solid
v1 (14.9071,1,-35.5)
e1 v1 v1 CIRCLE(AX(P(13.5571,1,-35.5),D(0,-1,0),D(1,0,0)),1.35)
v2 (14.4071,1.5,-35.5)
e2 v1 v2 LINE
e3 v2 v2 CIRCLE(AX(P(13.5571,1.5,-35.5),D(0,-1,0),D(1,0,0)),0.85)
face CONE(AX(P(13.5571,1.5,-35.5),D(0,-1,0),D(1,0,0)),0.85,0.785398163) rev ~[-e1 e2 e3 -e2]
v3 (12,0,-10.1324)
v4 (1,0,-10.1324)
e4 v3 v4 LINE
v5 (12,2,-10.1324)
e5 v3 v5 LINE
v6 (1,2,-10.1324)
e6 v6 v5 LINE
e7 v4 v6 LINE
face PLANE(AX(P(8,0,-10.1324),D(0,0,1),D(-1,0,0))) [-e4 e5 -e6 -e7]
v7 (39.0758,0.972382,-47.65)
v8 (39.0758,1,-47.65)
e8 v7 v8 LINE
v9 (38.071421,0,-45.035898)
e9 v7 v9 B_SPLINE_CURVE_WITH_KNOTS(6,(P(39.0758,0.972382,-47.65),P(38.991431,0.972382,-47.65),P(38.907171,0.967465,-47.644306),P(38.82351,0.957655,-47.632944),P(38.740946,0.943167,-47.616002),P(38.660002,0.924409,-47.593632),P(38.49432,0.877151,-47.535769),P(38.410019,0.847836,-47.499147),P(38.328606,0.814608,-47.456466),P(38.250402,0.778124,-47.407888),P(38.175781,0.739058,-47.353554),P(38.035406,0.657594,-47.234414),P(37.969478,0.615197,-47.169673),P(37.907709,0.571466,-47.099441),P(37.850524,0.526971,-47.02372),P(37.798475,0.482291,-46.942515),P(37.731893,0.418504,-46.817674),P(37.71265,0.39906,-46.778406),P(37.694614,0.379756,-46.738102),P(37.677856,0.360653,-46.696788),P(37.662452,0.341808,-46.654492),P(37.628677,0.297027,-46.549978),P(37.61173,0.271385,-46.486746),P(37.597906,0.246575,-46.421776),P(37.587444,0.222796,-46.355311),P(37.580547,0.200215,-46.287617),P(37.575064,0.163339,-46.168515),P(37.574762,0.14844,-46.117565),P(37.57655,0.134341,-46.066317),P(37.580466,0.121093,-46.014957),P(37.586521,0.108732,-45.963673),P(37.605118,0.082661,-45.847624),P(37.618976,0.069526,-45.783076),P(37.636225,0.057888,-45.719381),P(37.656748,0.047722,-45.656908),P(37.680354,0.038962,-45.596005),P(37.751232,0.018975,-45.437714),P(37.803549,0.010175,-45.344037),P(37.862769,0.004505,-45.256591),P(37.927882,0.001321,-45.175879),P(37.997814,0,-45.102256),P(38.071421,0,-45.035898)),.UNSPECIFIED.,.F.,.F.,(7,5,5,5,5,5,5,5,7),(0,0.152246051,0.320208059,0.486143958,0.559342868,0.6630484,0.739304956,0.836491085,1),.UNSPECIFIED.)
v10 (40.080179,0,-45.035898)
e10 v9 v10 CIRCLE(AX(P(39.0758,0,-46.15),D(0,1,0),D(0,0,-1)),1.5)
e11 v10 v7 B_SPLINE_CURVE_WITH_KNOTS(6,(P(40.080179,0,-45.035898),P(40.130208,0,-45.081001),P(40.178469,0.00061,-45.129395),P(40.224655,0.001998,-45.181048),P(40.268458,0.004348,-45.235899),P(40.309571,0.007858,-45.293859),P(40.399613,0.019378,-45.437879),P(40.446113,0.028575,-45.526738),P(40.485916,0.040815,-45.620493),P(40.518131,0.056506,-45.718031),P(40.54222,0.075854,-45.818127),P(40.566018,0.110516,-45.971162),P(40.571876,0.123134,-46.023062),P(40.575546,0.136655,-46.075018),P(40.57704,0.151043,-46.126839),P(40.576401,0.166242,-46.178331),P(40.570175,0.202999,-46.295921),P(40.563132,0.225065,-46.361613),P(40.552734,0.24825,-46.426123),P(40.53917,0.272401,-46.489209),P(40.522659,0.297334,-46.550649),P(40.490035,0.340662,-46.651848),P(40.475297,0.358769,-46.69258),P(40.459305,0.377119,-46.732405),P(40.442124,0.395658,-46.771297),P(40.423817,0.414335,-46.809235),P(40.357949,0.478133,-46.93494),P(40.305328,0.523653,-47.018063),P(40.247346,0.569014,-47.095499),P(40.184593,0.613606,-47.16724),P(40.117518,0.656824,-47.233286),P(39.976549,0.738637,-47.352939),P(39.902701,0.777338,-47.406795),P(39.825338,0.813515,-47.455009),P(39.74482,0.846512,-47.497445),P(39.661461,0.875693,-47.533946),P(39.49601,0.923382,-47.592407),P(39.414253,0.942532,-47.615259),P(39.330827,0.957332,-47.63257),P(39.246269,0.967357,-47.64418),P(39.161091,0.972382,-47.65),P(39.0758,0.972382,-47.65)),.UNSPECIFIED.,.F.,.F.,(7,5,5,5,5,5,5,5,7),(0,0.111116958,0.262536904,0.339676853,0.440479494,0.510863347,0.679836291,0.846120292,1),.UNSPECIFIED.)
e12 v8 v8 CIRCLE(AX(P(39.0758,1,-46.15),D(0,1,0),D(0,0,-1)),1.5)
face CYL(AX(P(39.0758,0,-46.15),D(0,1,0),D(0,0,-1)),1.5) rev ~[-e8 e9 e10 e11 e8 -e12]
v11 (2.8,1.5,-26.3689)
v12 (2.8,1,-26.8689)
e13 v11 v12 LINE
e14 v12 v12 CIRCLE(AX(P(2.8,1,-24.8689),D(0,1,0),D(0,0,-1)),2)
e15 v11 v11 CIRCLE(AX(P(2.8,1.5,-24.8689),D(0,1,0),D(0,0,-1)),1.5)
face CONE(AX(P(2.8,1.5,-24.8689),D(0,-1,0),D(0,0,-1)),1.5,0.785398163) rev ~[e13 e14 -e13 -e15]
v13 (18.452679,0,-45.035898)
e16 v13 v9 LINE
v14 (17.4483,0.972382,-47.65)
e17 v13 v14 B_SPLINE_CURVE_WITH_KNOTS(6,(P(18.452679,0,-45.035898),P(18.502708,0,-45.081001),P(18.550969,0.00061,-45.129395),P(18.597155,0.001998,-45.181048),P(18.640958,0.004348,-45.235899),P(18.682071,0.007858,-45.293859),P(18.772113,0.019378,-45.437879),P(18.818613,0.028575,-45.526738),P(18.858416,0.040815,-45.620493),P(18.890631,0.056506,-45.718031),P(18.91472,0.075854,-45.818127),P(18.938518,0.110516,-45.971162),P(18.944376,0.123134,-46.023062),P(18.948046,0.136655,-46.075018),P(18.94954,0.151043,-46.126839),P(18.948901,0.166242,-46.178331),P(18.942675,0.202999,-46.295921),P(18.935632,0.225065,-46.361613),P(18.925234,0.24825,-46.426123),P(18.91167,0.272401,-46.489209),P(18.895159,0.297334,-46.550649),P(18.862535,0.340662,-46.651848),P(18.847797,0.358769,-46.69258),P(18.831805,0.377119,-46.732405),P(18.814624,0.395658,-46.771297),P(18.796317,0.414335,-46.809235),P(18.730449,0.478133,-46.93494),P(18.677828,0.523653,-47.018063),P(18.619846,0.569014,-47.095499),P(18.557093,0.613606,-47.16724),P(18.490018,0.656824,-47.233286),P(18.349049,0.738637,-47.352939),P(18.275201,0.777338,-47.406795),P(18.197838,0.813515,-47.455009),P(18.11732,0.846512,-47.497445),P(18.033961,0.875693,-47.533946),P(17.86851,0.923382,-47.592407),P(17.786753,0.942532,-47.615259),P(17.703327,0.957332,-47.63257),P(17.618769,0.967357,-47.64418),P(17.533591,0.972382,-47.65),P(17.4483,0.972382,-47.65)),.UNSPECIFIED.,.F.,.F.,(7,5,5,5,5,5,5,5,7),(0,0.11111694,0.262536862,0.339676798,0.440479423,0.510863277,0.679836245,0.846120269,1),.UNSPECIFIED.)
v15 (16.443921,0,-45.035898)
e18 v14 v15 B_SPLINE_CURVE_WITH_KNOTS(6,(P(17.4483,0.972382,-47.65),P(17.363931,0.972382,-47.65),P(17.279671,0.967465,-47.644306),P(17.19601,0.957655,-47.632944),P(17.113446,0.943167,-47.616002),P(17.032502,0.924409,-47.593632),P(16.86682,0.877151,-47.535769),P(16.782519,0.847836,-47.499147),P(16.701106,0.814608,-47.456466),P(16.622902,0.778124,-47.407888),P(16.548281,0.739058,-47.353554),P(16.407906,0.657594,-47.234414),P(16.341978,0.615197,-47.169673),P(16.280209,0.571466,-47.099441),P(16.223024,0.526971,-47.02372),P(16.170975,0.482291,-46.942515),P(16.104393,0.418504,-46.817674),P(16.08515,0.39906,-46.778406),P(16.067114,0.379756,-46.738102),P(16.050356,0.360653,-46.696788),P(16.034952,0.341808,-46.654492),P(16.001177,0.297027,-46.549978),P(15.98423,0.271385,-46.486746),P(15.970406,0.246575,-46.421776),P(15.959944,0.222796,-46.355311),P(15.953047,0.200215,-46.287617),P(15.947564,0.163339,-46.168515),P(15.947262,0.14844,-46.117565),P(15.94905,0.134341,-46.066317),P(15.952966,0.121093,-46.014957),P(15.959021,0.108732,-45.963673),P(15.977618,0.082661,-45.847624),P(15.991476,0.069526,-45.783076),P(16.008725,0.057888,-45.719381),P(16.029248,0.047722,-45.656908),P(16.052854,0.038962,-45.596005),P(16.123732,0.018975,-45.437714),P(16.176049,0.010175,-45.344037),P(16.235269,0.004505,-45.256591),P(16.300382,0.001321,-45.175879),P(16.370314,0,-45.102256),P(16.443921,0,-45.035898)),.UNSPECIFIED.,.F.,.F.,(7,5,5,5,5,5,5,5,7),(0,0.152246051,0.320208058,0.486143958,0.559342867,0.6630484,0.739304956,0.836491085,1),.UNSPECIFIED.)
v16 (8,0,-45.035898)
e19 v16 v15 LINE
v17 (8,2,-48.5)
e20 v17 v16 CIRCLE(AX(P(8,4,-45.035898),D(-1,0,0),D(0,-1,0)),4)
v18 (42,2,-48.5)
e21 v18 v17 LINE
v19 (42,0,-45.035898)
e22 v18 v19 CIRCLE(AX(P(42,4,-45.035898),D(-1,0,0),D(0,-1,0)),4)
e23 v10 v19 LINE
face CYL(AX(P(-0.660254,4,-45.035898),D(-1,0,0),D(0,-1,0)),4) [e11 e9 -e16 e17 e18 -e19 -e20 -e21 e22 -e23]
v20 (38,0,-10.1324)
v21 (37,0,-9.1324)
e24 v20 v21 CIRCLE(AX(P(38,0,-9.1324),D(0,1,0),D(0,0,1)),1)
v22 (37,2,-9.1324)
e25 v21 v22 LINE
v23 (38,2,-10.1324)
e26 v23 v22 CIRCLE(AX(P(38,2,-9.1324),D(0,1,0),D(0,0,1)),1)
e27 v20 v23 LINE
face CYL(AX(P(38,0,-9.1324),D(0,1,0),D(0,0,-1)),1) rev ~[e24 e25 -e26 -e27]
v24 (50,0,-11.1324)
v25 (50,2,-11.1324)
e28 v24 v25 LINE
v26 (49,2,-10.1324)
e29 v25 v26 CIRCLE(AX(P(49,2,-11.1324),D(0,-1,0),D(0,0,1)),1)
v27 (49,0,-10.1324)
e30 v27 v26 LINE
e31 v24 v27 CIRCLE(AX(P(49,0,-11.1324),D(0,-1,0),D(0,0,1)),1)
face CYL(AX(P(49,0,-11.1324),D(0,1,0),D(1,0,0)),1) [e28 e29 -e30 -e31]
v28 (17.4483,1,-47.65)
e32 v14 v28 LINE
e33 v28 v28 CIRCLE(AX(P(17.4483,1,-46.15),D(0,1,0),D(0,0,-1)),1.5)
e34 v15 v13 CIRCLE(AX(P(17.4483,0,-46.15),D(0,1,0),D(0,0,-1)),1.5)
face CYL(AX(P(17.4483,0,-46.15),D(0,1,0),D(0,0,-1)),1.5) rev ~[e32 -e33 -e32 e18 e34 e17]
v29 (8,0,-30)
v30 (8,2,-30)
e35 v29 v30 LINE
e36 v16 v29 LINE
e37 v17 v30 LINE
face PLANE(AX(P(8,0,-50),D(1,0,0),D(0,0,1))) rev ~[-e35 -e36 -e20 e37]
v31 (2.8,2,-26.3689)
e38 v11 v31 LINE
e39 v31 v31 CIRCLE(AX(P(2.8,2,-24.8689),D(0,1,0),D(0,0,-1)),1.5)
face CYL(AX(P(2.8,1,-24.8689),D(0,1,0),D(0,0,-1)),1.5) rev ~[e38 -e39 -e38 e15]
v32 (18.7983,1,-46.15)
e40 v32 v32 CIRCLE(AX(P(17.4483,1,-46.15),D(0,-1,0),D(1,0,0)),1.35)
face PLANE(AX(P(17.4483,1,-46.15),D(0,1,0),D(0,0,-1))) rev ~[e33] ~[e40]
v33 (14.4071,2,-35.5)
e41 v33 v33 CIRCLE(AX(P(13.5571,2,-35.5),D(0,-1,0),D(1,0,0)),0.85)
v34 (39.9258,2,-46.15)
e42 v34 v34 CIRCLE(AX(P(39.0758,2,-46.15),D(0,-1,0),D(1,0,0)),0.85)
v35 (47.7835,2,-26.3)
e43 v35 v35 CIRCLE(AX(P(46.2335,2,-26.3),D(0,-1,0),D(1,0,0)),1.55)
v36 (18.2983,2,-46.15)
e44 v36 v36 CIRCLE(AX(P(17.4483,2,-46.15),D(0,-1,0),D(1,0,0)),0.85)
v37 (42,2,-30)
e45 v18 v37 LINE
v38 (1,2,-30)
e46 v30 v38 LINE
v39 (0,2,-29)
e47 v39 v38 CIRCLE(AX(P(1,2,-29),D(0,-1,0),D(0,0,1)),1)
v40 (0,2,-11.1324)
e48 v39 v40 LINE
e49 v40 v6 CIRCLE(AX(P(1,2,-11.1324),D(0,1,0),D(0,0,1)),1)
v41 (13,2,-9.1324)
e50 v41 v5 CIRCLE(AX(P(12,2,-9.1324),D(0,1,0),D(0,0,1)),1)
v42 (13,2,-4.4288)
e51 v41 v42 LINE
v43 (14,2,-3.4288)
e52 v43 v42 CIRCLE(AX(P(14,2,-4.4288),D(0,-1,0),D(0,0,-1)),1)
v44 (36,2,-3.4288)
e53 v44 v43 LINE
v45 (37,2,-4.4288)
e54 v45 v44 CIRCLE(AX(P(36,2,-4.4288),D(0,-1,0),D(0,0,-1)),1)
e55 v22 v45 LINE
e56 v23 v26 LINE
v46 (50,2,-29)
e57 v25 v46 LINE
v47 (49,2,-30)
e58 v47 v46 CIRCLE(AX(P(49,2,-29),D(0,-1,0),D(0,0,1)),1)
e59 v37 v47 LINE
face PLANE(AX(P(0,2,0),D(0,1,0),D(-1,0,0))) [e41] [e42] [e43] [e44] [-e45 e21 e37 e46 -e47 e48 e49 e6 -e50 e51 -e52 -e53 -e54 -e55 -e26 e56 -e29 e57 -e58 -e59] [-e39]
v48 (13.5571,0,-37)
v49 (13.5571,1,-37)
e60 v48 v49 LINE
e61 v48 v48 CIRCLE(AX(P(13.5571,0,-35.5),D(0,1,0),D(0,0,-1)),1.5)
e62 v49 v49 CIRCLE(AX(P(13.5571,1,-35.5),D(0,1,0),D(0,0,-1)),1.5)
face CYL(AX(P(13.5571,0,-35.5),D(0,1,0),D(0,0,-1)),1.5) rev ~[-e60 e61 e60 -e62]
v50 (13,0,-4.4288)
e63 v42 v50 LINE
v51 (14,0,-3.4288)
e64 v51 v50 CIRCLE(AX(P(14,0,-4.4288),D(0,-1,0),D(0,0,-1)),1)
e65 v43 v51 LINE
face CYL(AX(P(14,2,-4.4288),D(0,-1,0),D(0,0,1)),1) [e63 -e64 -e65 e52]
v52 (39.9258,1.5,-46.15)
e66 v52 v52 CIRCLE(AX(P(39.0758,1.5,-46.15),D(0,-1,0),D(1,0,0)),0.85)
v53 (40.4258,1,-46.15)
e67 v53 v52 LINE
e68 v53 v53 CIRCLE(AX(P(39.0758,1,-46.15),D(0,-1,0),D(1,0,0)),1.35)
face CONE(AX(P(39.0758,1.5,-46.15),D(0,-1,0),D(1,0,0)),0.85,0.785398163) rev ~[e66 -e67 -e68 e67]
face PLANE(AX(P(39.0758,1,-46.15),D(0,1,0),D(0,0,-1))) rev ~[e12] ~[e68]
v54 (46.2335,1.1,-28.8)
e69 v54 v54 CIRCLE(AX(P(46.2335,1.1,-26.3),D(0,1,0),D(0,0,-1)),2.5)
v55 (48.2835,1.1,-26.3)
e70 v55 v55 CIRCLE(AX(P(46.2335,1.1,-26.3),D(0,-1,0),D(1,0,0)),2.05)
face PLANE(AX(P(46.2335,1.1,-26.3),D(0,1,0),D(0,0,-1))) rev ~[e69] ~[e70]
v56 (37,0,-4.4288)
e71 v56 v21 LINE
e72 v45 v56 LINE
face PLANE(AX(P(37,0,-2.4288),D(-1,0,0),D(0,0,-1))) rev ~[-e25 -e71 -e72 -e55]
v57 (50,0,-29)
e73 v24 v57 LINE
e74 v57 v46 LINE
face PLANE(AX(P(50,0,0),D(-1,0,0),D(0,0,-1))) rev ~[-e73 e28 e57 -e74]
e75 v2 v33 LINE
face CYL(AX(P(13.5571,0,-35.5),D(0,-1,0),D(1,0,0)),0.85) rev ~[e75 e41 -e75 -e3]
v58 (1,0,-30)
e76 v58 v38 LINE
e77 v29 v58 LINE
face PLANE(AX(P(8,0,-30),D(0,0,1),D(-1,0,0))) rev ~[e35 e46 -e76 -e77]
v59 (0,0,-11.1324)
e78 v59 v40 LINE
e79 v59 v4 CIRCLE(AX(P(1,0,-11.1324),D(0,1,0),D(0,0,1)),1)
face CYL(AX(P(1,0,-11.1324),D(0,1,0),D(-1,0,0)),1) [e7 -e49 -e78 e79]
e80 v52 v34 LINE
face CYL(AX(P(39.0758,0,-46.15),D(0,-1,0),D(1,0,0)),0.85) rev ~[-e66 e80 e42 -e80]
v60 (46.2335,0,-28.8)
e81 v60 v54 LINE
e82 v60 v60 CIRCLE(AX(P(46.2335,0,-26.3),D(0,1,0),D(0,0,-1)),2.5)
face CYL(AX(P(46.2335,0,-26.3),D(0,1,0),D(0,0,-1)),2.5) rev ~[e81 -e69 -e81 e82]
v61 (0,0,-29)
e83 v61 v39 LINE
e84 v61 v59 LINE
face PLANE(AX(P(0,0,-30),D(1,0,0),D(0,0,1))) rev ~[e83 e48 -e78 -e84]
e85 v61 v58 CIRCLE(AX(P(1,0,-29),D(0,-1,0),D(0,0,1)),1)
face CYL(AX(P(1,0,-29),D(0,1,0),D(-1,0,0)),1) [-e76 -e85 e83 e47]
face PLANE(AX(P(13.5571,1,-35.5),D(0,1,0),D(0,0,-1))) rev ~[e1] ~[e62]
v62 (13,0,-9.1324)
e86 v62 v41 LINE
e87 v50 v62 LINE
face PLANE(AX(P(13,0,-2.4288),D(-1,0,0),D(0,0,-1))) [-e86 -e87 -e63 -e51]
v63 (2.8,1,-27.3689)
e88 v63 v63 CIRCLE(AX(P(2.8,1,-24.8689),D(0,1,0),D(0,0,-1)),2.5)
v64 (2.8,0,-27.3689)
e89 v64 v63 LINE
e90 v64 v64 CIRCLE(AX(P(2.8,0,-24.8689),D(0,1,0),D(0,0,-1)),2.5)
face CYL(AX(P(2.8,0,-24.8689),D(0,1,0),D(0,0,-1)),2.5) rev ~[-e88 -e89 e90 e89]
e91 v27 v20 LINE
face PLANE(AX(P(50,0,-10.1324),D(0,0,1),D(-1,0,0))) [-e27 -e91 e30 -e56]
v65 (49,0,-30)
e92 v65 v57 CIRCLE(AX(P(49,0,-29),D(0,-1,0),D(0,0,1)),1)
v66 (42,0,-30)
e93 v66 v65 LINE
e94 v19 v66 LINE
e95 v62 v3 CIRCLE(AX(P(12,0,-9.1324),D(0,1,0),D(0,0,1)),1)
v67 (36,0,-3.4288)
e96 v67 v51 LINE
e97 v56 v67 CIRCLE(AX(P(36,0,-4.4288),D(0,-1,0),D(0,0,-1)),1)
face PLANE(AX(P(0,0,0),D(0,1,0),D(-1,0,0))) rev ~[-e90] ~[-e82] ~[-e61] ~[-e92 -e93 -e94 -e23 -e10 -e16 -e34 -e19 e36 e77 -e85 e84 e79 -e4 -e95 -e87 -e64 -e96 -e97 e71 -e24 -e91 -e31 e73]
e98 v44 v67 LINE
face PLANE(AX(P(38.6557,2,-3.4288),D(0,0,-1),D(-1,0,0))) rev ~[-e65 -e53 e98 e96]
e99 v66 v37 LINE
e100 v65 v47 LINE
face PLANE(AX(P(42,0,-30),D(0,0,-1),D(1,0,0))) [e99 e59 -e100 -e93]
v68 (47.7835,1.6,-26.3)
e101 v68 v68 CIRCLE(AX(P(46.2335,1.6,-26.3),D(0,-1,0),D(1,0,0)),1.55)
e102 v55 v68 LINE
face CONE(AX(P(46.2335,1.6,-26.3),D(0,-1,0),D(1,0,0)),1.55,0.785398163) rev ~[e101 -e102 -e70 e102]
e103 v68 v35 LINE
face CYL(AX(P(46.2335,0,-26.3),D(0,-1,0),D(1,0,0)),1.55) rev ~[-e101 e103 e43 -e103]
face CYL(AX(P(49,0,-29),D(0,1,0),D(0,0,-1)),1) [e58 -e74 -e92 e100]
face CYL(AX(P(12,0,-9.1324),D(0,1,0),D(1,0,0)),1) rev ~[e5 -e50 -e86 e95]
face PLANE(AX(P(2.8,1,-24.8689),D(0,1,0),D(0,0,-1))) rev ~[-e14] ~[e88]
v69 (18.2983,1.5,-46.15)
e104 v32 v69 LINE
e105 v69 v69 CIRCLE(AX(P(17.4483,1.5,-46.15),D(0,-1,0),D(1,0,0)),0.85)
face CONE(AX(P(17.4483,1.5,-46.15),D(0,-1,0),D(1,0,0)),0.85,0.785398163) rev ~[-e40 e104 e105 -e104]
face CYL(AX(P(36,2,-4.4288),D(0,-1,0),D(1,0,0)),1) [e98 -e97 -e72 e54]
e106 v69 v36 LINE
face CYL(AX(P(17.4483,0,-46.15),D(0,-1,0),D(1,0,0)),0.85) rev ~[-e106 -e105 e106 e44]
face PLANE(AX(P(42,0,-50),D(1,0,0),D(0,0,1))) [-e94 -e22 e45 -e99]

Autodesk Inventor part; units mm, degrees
ref_plane "YZ Plane" through (0, 0, 0) normal (1, 0, 0) x (0, 1, 0)
ref_plane "XZ Plane" through (0, 0, 0) normal (0, 1, 0) x (-1, 0, 0)
ref_plane "XY Plane" through (0, 0, 0) normal (0, 0, 1) x (1, 0, 0)
sketch "Szkic1" plane through (0, 0, 0) normal (0, 1, 0) x (-1, 0, 0)
  line L0 (0, 0) -> (-50, 0)
  line L1 (-50, 0) -> (-50, -50)
  line L2 (-50, -50) -> (0, -50)
  line L3 (0, -50) -> (0, 0)
  line L4 (0, -50) -> (-8, -50)
  line L5 (-8, -50) -> (-8, -30)
  line L6 (-8, -30) -> (0, -30)
  line L7 (0, -30) -> (0, -50)
  line L8 (-50, -50) -> (-42, -50)
  line L9 (-42, -50) -> (-42, -30)
  line L10 (-42, -30) -> (-50, -30)
  line L11 (-50, -30) -> (-50, -50)
  dimension "d0" = 50
  dimension "d1" = 50
  dimension "d2" = 8
  dimension "d3" = 20
  dimension "d4" = 8
  dimension "d5" = 20
extrude "Wyciągnięcie proste1" add sketch "Szkic1" along normal blind 2 contours L3 L6 L5 L2 L9 L10 L1 L0
sketch "Szkic4" plane through (0, 2, 0) normal (0, 1, 0) x (1, 0, 0)
  line L0 (42, 50) -> (8, 50) projected
  line L1 (12.0571, 48.5) -> (42.467, 48.5) projected
  line L2 (42, 30) -> (42, 50) projected
  line L3 (42, 50) -> (8, 50)
  line L4 (8, 50) -> (8, 48.5)
  line L5 (8, 48.5) -> (42, 48.5)
  line L6 (42, 48.5) -> (42, 50)
  circle A0 centre (39.467, 46.75) radius 0.85 projected
  circle A1 centre (15.0571, 46.75) radius 0.85 projected
  arc A2 (48.301, 27.6749) -> (46.5, 27.9321) centre (47.25, 26.75) ccw projected
  point P0 (0, 0)
  point P1 (42, 48.5)
extrude "Wyciągnięcie proste3" cut sketch "Szkic4" against normal through all
sketch "Szkic6" plane through (0, 0, -30) normal (-1, 0, 0) x (0, 0, 1)
  line L0 (0, 0) -> (30, 0) projected
  line L1 (30, 0) -> (30, 2) projected
  line L2 (0, 2) -> (30, 2) projected
  line L3 (0, 0) -> (0, 2) projected
  line L4 (20.8419, 34.4275) -> (27.9622, -2) projected
  line L5 (27.9622, -2) -> (30, -2) projected
  line L6 (30, -2) -> (22.8048, 34.8111) projected
  line L7 (22.8048, 34.8111) -> (20.8419, 34.4275) projected
  point P0 (27.1803, 2)
  point P1 (27.5712, 0)
extrude "Wyciągnięcie proste5" cut sketch "Szkic6" against normal through all contours L4 L2 L6 L0 | L6 L2 L1 L0
sketch "Szkic7" plane through (0, 0, 0) normal (0, -1, 0) x (1, 0, 0)
  line L0 (50, -2.4288) -> (0, -2.4288) projected
  line L1 (0, -30) -> (0, -2.4288) projected
  line L2 (8, -30) -> (0, -30) projected
  line L3 (8, -48.5) -> (8, -30) projected
  line L4 (8, -48.5) -> (42, -48.5) projected
  line L5 (42, -30) -> (42, -48.5) projected
  line L6 (50, -30) -> (42, -30) projected
  line L7 (50, -2.4288) -> (50, -30) projected
  circle A0 centre (39.467, -46.75) radius 0.85 projected
  circle A1 centre (15.0571, -46.75) radius 0.85 projected
  line L8 (4, -10.1324) -> (0, -10.1324) projected
  line L9 (50, -10.1324) -> (45.5, -10.1324) projected
  line L10 (50, -10.1324) -> (42, -10.1324)
  line L11 (42, -10.1324) -> (42, -2.4288)
  line L12 (42, -2.4288) -> (50, -2.4288)
  line L13 (50, -2.4288) -> (50, -10.1324)
  line L14 (0, -2.4288) -> (8, -2.4288)
  line L15 (8, -2.4288) -> (8, -10.1324)
  line L16 (8, -10.1324) -> (0, -10.1324)
  line L17 (0, -10.1324) -> (0, -2.4288)
  point P0 (0, 0)
  dimension "d16" = 8
  dimension "d17" = 8
extrude "Wyciągnięcie proste6" cut sketch "Szkic7" against normal through all contours L7 L9 L10 L11 L0 | L15 L16 L8 L1 L0
fillet "Zaokrąglenie1" radius 1 4 edges at (0, 1, -30) (0, 1, -10.1324) (50, 1, -10.1324) (50, 1, -30)
sketch "Szkic9" plane through (0, 2, 0) normal (0, 1, 0) x (1, 0, 0)
  circle A0 centre (15.0571, 46.75) radius 0.85 projected
  circle A1 centre (39.467, 46.75) radius 0.85 projected
  point P0 (0, 0)
extrude "Wyciągnięcie proste8" add sketch "Szkic9" against normal up to surface (2 mm away)
sketch "Szkic10" plane through (0, 0, 0) normal (0, -1, 0) x (1, 0, 0)
  circle A0 centre (17.4483, -46.15) radius 0.6 projected
  circle A1 centre (39.0758, -46.15) radius 0.6 projected
  circle A2 centre (13.5571, -35.5) radius 0.6 projected
  circle A3 centre (46.2335, -26.3) radius 1.35 projected
  circle A4 centre (47.3, -13.0919) radius 1.35 projected
  circle A5 centre (3, -27) radius 1.4 projected
  circle A6 centre (3, -27) radius 1.55
  circle A7 centre (46.2335, -26.3) radius 1.55
  circle A8 centre (47.3, -13.0919) radius 1.55
  circle A9 centre (13.5571, -35.5) radius 0.85
  circle A10 centre (17.4483, -46.15) radius 0.85
  circle A11 centre (39.0758, -46.15) radius 0.85
  point P0 (0, 0)
  dimension "d25" = 3.1
  dimension "d26" = 1.7
extrude "Wyciągnięcie proste9" cut sketch "Szkic10" against normal through all contours A0 | A1 | A2 | A3 | A7 | A9 | A10 | A11
sketch "Szkic11" plane through (0, 0, 0) normal (0, -1, 0) x (1, 0, 0)
  circle A0 centre (47.3, -13.0919) radius 1.55 projected
  circle A1 centre (46.2335, -26.3) radius 1.55 projected
  circle A2 centre (3, -27) radius 1.55 projected
  circle A3 centre (13.5571, -35.5) radius 0.85 projected
  circle A4 centre (17.4483, -46.15) radius 0.85 projected
  circle A5 centre (39.0758, -46.15) radius 0.85 projected
  point P0 (0, 0)
hole "Otwór1" at (46.2335, 0, -26.3) direction (0, 1, 0) diameter 5 depth 1.1
hole "Otwór2" at (13.5571, 0, -35.5) at (17.4483, 0, -46.15) at (39.0758, 0, -46.15) direction (0, 1, 0) diameter 3 depth 1
sketch "Szkic12" plane through (0, 0, 0) normal (0, -1, 0) x (1, 0, 0)
  line L0 (49, -10.1324) -> (42, -10.1324) projected
  line L1 (8, -10.1324) -> (1, -10.1324) projected
  line L2 (50, -11.1324) -> (50, -29) projected
  line L3 (0, -29) -> (0, -11.1324) projected
  line L4 (50, -2.4288) -> (37, -2.4288)
  line L5 (37, -2.4288) -> (37, -10.1324)
  line L6 (37, -10.1324) -> (50, -10.1324)
  line L7 (50, -10.1324) -> (50, -2.4288)
  line L8 (0, -2.4288) -> (13, -2.4288)
  line L9 (13, -2.4288) -> (13, -10.1324)
  line L10 (13, -10.1324) -> (0, -10.1324)
  line L11 (0, -10.1324) -> (0, -2.4288)
  line L12 (42, -2.4288) -> (8, -2.4288) projected
  point P0 (0, 0)
  dimension "d43" = 13
  dimension "d44" = 13
extrude "Wyciągnięcie proste10" cut sketch "Szkic12" against normal through all
fillet "Zaokrąglenie2" radius 1 2 edges at (13, 1, -10.1324) (37, 1, -10.1324)
sketch "Szkic13" plane through (0, 2, 0) normal (0, 1, 0) x (1, 0, 0)
  line L0 (10.7953, -1.4378) -> (38.6557, -1.4378)
  line L1 (38.6557, -1.4378) -> (38.6557, 3.4288)
  line L2 (38.6557, 3.4288) -> (10.7953, 3.4288)
  line L3 (10.7953, 3.4288) -> (10.7953, -1.4378)
  line L4 (37, 2.4288) -> (13, 2.4288) projected
  point P0 (0, 0)
  dimension "d48" = 1
extrude "Wyciągnięcie proste11" cut sketch "Szkic13" against normal through all
fillet "Zaokrąglenie3" radius 1 2 edges at (13, 1, -3.4288) (37, 1, -3.4288)
fillet "Zaokrąglenie4" radius 4 1 edges at (25, 0, -48.5)
chamfer "Faza1" distance 0.5 angle 45 4 edges at (16.5983, 1, -46.15) (38.2258, 1, -46.15) (44.6835, 1.1, -26.3) (12.7071, 1, -35.5)
sketch "Szkic14" plane through (0, 0, 0) normal (0, -1, 0) x (1, 0, 0)
  circle A0 centre (2.8, -24.8689) radius 1.4 projected
  point P0 (0, 0)
hole "Otwór3" at (2.8, 0, -24.8689) direction (0, 1, 0) diameter 3 depth 2 counterbore diameter 5 counterbore depth 1
chamfer "Faza2" distance 0.5 angle 45 1 edges at (2.8, 1, -23.3689)
properties part number "podstawa_v2"
